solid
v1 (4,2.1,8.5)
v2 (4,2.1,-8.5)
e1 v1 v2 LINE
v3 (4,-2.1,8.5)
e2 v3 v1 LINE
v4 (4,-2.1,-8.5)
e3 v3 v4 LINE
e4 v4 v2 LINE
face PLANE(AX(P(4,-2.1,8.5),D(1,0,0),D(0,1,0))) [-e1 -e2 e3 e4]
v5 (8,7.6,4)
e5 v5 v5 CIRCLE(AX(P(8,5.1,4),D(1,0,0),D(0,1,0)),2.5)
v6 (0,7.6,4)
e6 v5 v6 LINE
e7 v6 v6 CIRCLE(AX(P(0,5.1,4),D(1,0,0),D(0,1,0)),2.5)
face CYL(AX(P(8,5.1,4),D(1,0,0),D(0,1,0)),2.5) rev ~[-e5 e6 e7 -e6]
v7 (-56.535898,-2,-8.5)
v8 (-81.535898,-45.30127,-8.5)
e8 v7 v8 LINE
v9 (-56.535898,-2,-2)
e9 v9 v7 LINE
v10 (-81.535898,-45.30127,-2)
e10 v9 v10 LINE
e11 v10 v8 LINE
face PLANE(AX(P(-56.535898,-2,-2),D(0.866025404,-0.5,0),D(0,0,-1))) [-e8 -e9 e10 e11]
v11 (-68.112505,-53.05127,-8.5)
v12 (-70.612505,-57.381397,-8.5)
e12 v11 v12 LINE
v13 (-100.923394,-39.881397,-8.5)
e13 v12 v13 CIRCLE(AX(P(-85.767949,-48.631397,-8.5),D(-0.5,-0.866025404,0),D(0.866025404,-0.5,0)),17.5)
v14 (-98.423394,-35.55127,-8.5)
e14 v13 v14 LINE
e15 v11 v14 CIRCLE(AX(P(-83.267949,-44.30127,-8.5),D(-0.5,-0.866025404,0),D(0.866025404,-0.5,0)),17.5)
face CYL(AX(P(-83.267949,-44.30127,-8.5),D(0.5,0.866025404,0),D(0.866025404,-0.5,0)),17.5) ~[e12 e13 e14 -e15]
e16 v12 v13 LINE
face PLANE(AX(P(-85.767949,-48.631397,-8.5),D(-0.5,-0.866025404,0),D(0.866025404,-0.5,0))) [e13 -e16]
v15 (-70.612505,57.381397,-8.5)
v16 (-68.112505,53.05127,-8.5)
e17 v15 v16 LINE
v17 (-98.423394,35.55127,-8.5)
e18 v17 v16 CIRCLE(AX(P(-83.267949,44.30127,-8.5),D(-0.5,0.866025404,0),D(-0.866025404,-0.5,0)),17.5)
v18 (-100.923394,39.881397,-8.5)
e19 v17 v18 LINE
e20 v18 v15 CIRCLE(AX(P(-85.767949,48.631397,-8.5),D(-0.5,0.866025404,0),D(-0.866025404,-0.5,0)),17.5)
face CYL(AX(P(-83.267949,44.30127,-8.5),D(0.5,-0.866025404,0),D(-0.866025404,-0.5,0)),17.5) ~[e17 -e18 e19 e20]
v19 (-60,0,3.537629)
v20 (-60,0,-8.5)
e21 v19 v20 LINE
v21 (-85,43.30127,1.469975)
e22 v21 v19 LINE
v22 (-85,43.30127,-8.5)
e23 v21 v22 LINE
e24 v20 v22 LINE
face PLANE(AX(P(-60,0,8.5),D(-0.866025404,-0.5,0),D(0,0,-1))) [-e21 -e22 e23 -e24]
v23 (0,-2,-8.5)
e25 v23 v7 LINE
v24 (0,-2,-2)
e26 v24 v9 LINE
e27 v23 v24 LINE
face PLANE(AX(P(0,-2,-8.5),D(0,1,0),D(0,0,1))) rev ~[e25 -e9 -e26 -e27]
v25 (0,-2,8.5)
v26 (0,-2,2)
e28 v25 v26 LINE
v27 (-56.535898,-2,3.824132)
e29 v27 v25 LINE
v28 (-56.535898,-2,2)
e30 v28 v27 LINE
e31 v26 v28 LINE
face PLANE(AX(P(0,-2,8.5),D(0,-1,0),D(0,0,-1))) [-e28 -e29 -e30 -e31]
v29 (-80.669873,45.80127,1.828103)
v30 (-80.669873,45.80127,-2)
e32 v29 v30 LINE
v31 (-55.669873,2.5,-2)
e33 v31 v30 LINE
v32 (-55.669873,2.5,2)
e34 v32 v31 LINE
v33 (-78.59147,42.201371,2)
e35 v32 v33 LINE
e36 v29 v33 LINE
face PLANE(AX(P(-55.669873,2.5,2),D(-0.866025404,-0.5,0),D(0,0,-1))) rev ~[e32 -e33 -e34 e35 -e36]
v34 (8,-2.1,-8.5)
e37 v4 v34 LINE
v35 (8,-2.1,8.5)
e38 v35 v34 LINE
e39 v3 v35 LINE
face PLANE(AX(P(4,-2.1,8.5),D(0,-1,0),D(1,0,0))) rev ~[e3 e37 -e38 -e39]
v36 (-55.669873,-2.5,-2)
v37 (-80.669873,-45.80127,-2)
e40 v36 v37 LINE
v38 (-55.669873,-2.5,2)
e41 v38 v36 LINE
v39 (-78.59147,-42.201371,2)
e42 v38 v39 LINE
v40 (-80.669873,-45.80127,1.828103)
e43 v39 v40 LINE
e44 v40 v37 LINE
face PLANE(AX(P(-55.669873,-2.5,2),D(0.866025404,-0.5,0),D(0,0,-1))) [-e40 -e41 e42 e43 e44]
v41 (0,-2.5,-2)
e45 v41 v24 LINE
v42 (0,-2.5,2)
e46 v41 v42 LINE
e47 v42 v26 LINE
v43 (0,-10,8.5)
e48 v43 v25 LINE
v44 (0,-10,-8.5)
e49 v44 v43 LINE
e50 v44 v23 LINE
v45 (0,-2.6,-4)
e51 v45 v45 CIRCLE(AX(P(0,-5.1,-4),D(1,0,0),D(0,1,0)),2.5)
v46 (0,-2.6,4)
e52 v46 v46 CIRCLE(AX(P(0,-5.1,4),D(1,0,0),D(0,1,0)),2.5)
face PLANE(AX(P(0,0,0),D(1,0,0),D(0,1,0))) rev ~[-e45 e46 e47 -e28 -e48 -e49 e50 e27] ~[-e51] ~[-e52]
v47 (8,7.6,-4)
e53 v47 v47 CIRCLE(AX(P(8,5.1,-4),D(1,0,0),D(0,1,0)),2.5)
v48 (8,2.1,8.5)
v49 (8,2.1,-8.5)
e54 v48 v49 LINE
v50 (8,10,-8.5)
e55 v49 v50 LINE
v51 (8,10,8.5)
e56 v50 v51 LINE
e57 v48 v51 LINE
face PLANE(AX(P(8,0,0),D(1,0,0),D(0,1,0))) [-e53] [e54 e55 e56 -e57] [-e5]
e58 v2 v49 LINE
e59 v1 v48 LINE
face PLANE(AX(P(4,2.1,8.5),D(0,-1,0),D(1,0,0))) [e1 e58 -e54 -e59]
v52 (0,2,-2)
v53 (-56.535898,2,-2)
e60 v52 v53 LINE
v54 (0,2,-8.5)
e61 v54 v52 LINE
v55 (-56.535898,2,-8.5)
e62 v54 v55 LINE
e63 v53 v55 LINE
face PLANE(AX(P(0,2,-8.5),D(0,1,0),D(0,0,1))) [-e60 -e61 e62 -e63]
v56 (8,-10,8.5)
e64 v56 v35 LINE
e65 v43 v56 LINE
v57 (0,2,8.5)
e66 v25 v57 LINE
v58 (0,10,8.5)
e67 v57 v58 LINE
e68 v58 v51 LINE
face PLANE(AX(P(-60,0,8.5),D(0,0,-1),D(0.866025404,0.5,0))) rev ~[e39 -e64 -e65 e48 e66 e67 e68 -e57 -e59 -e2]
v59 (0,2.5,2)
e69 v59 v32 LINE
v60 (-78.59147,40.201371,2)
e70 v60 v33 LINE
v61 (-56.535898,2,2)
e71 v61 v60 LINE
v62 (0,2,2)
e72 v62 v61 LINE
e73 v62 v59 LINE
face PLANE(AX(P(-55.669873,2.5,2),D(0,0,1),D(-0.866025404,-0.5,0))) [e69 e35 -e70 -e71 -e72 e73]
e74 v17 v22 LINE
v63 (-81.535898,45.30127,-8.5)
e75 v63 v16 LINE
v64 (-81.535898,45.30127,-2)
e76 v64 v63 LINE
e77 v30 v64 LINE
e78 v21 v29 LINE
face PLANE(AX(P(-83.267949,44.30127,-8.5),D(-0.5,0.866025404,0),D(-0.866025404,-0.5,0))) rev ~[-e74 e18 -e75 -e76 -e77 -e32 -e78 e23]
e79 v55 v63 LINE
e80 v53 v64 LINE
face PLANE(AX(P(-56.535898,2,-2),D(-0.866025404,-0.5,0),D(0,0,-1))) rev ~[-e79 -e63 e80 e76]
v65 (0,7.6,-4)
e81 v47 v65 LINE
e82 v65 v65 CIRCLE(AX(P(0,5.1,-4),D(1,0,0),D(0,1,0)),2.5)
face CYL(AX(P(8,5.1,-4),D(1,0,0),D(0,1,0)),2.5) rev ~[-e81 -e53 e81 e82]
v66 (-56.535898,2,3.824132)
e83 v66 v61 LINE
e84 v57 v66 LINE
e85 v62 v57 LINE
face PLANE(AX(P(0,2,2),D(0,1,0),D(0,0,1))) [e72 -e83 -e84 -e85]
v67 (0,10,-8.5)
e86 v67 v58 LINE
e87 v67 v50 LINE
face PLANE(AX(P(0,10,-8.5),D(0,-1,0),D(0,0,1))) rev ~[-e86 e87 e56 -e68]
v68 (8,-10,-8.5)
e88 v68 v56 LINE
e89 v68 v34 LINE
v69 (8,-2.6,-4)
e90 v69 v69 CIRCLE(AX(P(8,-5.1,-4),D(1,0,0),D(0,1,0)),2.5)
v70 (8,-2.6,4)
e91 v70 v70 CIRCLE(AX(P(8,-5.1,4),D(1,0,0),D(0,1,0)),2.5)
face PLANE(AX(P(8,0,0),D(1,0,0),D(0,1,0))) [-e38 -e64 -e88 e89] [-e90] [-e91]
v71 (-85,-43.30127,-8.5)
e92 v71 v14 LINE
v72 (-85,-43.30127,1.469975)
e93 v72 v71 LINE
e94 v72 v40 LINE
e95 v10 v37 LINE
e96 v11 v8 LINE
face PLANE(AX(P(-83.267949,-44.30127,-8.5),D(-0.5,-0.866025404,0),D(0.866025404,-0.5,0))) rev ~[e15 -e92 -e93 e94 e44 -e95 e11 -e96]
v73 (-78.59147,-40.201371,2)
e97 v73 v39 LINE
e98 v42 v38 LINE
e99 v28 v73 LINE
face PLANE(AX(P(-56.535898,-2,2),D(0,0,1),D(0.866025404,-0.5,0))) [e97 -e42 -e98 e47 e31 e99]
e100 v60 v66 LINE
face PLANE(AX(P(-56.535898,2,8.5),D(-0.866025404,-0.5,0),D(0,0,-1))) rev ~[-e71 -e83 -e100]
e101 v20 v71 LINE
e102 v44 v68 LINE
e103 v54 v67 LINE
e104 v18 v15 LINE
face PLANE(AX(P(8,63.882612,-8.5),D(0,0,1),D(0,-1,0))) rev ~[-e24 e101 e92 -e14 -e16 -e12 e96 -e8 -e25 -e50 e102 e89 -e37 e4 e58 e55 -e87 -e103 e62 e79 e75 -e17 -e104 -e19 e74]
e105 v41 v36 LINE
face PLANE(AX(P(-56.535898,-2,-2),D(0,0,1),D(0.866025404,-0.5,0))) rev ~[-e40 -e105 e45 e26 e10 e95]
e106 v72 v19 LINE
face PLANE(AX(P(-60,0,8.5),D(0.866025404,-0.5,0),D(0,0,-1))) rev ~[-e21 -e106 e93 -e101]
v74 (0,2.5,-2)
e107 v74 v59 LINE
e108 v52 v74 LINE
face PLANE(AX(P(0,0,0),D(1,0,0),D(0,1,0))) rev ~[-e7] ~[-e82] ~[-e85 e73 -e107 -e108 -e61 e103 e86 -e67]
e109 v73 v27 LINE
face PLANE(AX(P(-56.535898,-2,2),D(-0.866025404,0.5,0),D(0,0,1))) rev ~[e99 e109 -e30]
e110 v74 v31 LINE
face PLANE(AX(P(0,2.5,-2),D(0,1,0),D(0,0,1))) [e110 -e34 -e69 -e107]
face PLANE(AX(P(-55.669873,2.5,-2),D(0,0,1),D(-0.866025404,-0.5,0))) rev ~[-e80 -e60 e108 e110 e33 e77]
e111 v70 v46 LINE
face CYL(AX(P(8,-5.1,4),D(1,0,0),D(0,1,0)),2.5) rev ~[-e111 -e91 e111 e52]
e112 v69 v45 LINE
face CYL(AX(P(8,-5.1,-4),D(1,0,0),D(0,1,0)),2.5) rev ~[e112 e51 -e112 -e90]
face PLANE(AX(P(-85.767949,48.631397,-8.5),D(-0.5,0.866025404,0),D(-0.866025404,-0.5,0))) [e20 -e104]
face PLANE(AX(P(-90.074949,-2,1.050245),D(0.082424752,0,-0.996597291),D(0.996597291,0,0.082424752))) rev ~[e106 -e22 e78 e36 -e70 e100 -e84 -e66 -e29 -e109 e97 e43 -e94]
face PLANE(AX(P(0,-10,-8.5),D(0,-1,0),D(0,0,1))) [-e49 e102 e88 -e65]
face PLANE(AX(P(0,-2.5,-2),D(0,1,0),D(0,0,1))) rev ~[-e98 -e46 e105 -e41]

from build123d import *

# Parameters (mm, degrees)
F0_W      = 20
F0_H      = 17
F1_DEPTH  = 8
F2_W      = 4
F2_H      = 4.2
F3_DEPTH  = 17.001
F4_R      = 2.5
F5_DEPTH  = 8.001
F6_W      = 4
F6_H      = 6.5
F6_W_2    = 0.5
F6_H_2    = 4
F7_DEPTH  = 60
F9_DEPTH  = 17.001
F10_DEPTH = 50
F11_DEPTH = 50
F13_DEPTH = 47.8022701892
F14_DEPTH = 43.8022701892
F15_R     = 17.5
F16_DEPTH = 5
F17_R     = 17.5
F18_DEPTH = 5
F20_DEPTH = 108.9243937587


# Not quite as in the source:
# - a feature names something its author has since deleted; it is built from what else it names


with BuildPart() as f1:
    # F0 (on Right) → F1 (new body)
    with BuildSketch(Plane.YZ):
        Rectangle(F0_W, F0_H)
    extrude(amount=F1_DEPTH)

    # F2 (on face) → F3 (cut, through all)
    with BuildSketch(Plane.XY.offset(8.5)):
        with Locations((6, 0)):
            Rectangle(F2_W, F2_H)
    extrude(amount=-F3_DEPTH, mode=Mode.SUBTRACT)

    # F4 (on face) → F5 (cut, through all)
    with BuildSketch(Plane.YZ.offset(8)):
        with Locations((-5.1, 4)):
            Circle(F4_R)
        with Locations((5.1, 4)):
            Circle(F4_R)
        with Locations((-5.1, -4)):
            Circle(F4_R)
        with Locations((5.1, -4)):
            Circle(F4_R)
    extrude(amount=-F5_DEPTH, mode=Mode.SUBTRACT)

    # F6 (on Right) → F7 (join)
    with BuildSketch(Plane.YZ):
        with Locations((0, 5.25)):
            Rectangle(F6_W, F6_H)
        with Locations((2.25, 0)):
            Rectangle(F6_W_2, F6_H_2)
        Rectangle(F6_W, F6_H_2)
        with Locations((-2.25, 0)):
            Rectangle(F6_W_2, F6_H_2)
        with Locations((0, -5.25)):
            Rectangle(F6_W, F6_H)
    extrude(amount=-F7_DEPTH)

    # F8 (on face) → F9 (cut, through all)
    with BuildSketch(Plane.XY.offset(8.5)):
        Polygon((-60, -2.5), (-55.6698729811, -2.5), (-60, 0), align=None)
        Polygon((-60, 2.5), (-60, 0), (-55.6698729811, 2.5), align=None)
    extrude(amount=-F9_DEPTH, mode=Mode.SUBTRACT)

    # F10 (add): a face of the model
    f10_faces = [f1.faces().sort_by_distance(p)[0] for p in [
        (-58.1476678863, -1.0694444444, 0),
    ]]
    extrude(f10_faces, amount=F10_DEPTH)

    # F11 (add): a face of the model
    f11_faces = [f1.faces().sort_by_distance(p)[0] for p in [
        (-58.1476678863, 1.0694444444, 0),
    ]]
    extrude(f11_faces, amount=F11_DEPTH)

    # F12 (on face) → F13 (cut, through all)
    with BuildSketch(Plane.XZ.offset(2)):
        Polygon((0, 8.5), (-90.0749489665, 12.646025978), (-90.0749489665, 1.0502453661), align=None)
    extrude(amount=-F13_DEPTH, mode=Mode.SUBTRACT)

    # F12 (on face) → F14 (cut, through all)
    with BuildSketch(Plane.XZ.offset(2)):
        Polygon((0, 8.5), (-90.0749489665, 12.646025978), (-90.0749489665, 1.0502453661), align=None)
    extrude(amount=F14_DEPTH, mode=Mode.SUBTRACT)

    # F15 (on face) → F16 (join)
    with BuildSketch(Plane(origin=(-40, -69.2820323028, 0), x_dir=(0.8660254038, -0.5, 0), z_dir=(-0.5, -0.8660254038, 0))):
        with Locations((-49.9615242271, -8.5)):
            Circle(F15_R)
    extrude(amount=F16_DEPTH)

    # F17 (on face) → F18 (join)
    with BuildSketch(Plane(origin=(-40, 69.2820323028, 0), x_dir=(-0.8660254038, -0.5, 0), z_dir=(-0.5, 0.8660254038, 0))):
        with Locations((49.9615242271, -8.5)):
            Circle(F17_R)
    extrude(amount=F18_DEPTH)

    # F19 (on face) → F20 (cut, through all)
    with BuildSketch(Plane.YZ.offset(8)):
        Polygon((63.882611692, -8.5), (0, -8.5), (-60.1151846349, -8.5), (-60.0160695612, -29.4797774404), (63.882611692, -28.5877082497), align=None)
    extrude(amount=-F20_DEPTH, mode=Mode.SUBTRACT)


solid = f1.part
